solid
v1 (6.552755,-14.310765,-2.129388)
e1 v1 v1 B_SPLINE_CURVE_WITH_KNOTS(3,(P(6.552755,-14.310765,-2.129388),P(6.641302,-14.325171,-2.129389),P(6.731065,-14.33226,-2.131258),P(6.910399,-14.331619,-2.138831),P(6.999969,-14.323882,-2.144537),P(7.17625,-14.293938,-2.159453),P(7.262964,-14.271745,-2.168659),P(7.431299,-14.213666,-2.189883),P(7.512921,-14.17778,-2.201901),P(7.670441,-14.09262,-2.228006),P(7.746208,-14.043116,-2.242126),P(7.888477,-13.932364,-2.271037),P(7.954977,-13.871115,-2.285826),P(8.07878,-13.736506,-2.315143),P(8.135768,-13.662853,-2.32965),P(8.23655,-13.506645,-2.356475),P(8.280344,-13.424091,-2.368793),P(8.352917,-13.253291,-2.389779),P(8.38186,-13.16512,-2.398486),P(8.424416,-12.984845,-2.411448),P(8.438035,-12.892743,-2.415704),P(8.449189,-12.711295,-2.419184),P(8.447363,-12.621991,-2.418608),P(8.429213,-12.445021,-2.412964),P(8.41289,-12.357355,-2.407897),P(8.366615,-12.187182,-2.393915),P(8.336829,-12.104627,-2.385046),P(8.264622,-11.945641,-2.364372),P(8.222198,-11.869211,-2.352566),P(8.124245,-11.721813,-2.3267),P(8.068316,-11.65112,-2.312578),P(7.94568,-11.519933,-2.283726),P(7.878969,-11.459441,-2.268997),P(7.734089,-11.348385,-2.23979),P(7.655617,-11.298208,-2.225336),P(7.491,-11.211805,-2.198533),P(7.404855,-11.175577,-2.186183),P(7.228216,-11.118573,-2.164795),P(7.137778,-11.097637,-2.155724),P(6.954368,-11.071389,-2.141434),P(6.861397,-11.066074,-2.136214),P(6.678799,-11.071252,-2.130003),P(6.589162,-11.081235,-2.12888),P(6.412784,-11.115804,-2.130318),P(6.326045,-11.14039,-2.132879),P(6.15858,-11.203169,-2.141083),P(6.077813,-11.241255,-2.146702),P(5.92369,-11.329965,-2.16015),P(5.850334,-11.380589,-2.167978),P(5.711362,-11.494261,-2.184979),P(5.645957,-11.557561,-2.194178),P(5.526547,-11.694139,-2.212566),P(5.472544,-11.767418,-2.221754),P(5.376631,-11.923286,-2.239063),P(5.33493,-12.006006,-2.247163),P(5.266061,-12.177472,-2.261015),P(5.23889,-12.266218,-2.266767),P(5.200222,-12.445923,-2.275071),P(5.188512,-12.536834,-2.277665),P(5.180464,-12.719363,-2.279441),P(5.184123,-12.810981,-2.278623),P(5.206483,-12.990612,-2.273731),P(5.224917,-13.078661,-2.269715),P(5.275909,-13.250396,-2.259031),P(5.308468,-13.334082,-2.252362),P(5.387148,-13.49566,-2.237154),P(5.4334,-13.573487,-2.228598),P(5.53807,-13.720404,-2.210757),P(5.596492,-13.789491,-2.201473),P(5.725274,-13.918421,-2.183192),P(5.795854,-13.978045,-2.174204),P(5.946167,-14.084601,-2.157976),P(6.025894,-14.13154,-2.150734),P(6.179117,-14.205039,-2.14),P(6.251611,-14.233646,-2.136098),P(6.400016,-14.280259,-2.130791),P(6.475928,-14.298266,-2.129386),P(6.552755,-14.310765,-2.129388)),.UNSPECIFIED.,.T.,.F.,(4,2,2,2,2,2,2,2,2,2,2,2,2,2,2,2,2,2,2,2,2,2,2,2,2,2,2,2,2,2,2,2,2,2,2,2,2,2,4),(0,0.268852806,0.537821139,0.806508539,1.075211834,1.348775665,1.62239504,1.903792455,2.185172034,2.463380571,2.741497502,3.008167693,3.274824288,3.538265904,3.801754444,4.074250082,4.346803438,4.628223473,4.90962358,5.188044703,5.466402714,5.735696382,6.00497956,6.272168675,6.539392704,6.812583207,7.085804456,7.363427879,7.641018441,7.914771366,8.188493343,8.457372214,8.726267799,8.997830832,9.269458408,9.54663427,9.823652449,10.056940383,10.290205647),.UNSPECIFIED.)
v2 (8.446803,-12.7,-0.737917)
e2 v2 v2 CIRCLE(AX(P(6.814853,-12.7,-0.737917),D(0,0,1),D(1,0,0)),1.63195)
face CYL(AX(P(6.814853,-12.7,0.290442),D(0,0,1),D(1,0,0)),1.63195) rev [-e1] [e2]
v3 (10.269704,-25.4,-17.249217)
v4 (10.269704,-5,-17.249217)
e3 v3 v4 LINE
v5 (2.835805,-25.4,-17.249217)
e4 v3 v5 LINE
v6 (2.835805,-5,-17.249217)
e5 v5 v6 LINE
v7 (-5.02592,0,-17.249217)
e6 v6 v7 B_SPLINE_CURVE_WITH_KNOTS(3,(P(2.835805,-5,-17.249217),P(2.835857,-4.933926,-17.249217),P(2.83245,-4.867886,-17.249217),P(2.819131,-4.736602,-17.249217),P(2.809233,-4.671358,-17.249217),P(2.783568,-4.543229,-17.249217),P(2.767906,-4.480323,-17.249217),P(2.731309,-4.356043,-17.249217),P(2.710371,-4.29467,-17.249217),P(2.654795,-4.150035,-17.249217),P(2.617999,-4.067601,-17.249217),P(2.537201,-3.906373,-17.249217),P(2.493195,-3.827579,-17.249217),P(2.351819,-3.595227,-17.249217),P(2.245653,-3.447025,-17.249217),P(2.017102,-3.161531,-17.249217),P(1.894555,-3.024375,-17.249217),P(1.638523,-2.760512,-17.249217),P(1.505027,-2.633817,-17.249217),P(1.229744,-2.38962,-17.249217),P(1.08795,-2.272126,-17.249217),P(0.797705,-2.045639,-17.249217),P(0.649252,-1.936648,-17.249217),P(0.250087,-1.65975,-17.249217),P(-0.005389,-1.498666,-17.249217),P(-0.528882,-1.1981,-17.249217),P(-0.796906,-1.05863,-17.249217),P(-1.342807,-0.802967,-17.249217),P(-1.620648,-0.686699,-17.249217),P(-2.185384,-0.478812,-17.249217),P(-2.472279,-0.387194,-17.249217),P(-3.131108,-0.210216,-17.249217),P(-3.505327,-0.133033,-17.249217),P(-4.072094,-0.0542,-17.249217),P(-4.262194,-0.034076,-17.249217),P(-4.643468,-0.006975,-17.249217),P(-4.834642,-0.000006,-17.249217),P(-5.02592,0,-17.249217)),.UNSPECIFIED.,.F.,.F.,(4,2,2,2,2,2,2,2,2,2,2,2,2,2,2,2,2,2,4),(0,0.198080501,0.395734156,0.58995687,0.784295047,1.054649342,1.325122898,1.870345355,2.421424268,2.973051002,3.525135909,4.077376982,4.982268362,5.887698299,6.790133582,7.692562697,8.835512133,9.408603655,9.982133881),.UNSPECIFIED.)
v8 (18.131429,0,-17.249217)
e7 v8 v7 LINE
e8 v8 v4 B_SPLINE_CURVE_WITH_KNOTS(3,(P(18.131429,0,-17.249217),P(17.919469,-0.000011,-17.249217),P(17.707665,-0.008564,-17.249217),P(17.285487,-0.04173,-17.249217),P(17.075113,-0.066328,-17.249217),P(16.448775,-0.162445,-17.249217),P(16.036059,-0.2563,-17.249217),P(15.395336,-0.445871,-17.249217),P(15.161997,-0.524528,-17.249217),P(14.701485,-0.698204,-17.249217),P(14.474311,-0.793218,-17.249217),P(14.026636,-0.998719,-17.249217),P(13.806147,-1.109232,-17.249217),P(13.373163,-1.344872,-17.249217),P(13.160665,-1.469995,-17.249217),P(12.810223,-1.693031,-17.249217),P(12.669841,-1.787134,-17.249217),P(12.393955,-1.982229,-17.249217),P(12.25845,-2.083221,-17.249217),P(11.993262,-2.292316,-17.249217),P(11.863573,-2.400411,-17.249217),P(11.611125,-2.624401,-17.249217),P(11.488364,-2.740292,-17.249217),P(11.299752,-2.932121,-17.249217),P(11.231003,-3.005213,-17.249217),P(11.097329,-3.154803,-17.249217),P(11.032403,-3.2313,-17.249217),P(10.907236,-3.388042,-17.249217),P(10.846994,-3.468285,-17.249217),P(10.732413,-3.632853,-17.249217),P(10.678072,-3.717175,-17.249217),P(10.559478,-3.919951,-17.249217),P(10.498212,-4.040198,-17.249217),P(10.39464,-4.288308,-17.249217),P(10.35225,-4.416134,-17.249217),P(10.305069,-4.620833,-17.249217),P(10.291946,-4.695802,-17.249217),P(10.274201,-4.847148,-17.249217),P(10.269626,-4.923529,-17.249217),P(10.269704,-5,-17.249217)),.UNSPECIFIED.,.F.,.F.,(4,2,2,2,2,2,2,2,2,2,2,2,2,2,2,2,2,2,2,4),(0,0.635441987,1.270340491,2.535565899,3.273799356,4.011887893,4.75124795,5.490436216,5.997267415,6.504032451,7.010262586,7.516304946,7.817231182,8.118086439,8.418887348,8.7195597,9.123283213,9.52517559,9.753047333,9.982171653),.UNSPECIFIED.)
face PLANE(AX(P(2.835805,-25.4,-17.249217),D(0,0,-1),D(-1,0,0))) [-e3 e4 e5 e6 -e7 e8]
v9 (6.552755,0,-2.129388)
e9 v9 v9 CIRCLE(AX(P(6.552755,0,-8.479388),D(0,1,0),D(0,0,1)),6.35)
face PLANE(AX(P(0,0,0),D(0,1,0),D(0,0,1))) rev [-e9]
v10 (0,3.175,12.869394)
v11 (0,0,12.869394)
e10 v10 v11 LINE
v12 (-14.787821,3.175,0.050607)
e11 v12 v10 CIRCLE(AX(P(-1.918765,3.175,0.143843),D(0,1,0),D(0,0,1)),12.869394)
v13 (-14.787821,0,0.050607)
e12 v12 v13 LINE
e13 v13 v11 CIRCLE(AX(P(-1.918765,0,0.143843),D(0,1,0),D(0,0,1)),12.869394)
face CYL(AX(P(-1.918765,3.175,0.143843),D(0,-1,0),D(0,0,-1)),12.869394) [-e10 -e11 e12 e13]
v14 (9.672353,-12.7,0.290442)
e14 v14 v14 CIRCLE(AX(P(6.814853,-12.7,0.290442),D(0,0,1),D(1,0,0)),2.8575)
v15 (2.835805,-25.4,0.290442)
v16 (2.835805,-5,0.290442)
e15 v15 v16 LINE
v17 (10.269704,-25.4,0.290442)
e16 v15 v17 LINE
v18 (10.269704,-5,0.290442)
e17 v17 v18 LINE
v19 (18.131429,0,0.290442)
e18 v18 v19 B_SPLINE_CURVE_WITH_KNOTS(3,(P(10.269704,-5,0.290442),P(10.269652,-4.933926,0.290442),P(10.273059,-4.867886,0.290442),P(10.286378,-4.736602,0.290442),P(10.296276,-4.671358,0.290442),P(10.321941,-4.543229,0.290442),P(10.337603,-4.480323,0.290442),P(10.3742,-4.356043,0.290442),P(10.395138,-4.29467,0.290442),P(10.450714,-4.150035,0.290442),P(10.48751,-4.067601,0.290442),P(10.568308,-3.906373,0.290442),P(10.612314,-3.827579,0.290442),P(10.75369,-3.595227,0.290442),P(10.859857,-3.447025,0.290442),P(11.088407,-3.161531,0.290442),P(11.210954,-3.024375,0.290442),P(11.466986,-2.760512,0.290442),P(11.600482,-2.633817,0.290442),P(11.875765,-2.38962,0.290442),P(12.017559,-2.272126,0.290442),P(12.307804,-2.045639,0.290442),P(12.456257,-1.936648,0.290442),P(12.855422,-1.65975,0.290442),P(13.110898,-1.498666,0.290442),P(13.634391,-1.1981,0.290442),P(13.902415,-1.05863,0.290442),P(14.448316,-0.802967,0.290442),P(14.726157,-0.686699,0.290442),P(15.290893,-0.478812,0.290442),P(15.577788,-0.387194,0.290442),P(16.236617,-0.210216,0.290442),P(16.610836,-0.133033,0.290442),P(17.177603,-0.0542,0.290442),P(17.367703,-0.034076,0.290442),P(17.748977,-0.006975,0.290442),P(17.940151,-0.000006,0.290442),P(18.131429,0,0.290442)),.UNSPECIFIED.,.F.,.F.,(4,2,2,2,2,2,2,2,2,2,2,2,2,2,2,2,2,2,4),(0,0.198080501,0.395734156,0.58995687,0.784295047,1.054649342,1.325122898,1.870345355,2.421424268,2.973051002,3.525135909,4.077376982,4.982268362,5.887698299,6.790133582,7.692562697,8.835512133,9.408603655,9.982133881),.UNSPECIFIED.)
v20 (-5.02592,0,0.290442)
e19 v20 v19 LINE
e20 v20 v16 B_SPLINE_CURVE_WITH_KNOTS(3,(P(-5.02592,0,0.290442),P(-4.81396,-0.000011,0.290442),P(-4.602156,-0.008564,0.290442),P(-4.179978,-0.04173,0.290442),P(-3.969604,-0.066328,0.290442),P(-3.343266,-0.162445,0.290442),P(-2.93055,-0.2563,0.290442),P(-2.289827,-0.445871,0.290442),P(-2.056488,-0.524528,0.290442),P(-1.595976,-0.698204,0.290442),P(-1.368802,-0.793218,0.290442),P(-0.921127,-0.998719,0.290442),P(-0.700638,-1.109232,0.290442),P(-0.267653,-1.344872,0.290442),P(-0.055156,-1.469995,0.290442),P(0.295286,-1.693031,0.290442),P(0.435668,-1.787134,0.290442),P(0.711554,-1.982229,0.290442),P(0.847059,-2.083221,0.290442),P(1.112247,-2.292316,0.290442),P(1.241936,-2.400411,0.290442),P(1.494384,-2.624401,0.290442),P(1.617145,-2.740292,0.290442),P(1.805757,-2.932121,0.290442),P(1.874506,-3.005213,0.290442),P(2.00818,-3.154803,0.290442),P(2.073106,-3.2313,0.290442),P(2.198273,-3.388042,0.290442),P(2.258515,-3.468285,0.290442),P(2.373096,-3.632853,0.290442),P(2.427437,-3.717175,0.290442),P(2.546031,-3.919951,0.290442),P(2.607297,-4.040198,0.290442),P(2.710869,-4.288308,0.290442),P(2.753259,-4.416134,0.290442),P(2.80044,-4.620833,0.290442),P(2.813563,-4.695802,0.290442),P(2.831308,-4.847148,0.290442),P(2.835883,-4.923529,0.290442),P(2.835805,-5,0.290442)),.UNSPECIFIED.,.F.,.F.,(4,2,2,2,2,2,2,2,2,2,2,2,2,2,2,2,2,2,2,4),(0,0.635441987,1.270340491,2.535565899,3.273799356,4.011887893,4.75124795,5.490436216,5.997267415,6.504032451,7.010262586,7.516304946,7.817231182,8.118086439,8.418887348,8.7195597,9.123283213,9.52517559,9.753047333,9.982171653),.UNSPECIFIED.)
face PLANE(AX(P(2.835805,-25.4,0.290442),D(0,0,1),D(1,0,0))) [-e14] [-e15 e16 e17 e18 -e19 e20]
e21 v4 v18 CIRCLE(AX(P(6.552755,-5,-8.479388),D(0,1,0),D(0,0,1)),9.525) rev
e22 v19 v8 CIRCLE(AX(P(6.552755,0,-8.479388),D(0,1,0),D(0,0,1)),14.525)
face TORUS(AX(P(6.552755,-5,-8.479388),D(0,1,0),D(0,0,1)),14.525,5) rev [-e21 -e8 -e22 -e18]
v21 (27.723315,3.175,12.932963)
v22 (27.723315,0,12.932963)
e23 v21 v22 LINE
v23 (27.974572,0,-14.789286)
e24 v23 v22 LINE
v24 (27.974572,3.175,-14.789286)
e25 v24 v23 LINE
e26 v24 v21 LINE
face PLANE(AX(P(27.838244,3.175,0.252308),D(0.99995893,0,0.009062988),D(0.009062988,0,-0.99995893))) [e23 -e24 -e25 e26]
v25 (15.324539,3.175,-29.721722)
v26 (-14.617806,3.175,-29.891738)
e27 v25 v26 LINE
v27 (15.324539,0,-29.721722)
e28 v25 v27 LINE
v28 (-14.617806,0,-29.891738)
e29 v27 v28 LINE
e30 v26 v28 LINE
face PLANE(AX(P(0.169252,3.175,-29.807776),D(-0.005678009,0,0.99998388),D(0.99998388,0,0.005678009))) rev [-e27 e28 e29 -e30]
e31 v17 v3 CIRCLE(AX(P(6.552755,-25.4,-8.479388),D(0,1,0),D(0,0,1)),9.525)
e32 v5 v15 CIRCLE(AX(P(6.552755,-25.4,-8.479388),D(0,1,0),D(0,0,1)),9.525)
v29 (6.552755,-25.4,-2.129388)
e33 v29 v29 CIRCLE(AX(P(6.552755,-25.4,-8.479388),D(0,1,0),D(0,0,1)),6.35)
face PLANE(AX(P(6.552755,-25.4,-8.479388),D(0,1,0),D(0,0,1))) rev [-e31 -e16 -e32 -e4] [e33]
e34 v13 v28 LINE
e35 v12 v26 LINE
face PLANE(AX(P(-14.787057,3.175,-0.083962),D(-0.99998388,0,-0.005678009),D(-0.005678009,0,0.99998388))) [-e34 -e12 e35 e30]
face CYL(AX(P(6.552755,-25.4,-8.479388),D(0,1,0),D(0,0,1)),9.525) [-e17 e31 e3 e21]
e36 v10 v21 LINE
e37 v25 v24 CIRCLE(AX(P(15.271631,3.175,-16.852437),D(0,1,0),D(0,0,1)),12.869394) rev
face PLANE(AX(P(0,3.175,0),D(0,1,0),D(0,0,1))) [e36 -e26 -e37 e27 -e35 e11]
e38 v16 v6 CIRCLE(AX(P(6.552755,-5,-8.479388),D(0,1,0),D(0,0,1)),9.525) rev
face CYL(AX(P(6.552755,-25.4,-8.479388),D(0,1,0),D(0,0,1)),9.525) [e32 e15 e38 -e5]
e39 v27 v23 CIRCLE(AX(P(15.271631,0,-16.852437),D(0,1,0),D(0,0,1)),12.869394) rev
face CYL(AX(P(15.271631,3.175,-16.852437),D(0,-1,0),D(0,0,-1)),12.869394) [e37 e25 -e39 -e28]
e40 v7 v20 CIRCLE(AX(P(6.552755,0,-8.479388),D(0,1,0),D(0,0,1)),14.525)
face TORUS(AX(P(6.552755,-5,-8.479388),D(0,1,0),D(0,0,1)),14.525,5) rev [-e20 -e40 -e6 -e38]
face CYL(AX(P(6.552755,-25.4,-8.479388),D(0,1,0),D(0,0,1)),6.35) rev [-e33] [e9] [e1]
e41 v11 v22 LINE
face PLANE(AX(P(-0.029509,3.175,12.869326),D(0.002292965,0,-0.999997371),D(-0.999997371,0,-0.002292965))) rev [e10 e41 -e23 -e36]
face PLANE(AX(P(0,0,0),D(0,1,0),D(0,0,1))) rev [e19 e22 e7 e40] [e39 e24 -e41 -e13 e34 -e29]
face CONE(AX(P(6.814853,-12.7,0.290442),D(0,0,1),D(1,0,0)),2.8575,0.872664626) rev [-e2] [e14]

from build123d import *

# Parameters (mm, degrees)
BOSS_EXTRUDE1_DEPTH                         = 3.175
SKETCH2_R                                   = 6.35
BOSS_EXTRUDE2_DEPTH                         = 25.4
CSK_START                                   = -3
CSK_FOR_4_FLAT_HEAD_MACHINE_SCREW_2_R       = 1.63195
CSK_FOR_4_FLAT_HEAD_MACHINE_SCREW_100_DEPTH = 3.290441965
FILLET1_R                                   = 5


with BuildPart() as part:
    # Sketch3 → Boss-Extrude1 (new body)
    with BuildSketch(Plane(origin=(0, 0, 0), x_dir=(1, 0, 0), z_dir=(0, 1, 0))):
        with BuildLine():
            Line((-14.617805765, 29.891737943), (27.723314788, -12.932962722))
            Line((27.723314788, -12.932962722), (0, -12.869393963))
            ThreePointArc((0, -12.869393963), (-10.348328742, -9.868233169), (-14.787821417, -0.050607252))
            Line((-14.787821417, -0.050607252), (-14.617805765, 29.891737943))
        make_face()
        with BuildLine():
            Line((15.324539429, 29.721722291), (-14.617805765, 29.891737943))
            Line((-14.617805765, 29.891737943), (27.723314788, -12.932962722))
            Line((27.723314788, -12.932962722), (27.974571526, 14.789286355))
            ThreePointArc((27.974571526, 14.789286355), (25.091118162, 25.171028529), (15.324539429, 29.721722291))
        make_face()
    extrude(amount=BOSS_EXTRUDE1_DEPTH)

    # Sketch2 → Boss-Extrude2 (add)
    with BuildSketch(Plane(origin=(0, 0, 0), x_dir=(1, 0, 0), z_dir=(0, 1, 0))):
        with BuildLine():
            Line((2.835804927, -0.290441965), (10.269704096, -0.290441965))
            ThreePointArc((10.269704096, -0.290441965), (16.077754512, 8.47938761), (10.269704096, 17.249217186))
            Line((10.269704096, 17.249217186), (2.835804927, 17.249217186))
            ThreePointArc((2.835804927, 17.249217186), (-2.972245488, 8.47938761), (2.835804927, -0.290441965))
        make_face()
        with Locations(Location((6.552754512, 8.47938761, 0), (0, 0, 270))):
            Circle(SKETCH2_R, mode=Mode.SUBTRACT)
    extrude(amount=-BOSS_EXTRUDE2_DEPTH)

    # CSK for #4 Flat Head Machine Screw (100)1: read off the stored shape, not the designer's step
    # CSK for _4 Flat Head Machine Screw _ 2 → CSK for #4 Flat Head Machine Screw (100)1 (cut)
    with BuildSketch(Plane.XY.offset(CSK_START)):
        with Locations((6.81485322, -12.7)):
            Circle(CSK_FOR_4_FLAT_HEAD_MACHINE_SCREW_2_R)
    extrude(amount=CSK_FOR_4_FLAT_HEAD_MACHINE_SCREW_100_DEPTH, mode=Mode.SUBTRACT)

    # CSK for _4 Flat Head Machine Screw _ 3 o → CSK for _4 Flat Head Machine Screw _ 3 (revolve, cut)
    with BuildSketch(Plane(origin=(6.81485322, -12.7, 0), x_dir=(1, 0, 0), z_dir=(0, -1, 0))):
        Polygon((1.63195, 0.290441965), (1.63195, -0.737916588), (2.8575, 0.290441965), align=None)
    revolve(axis=Axis((6.81485322, -12.7, 0), (0, 0, 1)), mode=Mode.SUBTRACT)

    # Fillet1
    fillet1_edges = [part.edges().sort_by_distance(p)[0] for p in [
        (-2.972245488, 0, -8.47938761),
        (16.077754512, 0, -8.47938761),
    ]]
    fillet(fillet1_edges, radius=FILLET1_R)


solid = part.part
